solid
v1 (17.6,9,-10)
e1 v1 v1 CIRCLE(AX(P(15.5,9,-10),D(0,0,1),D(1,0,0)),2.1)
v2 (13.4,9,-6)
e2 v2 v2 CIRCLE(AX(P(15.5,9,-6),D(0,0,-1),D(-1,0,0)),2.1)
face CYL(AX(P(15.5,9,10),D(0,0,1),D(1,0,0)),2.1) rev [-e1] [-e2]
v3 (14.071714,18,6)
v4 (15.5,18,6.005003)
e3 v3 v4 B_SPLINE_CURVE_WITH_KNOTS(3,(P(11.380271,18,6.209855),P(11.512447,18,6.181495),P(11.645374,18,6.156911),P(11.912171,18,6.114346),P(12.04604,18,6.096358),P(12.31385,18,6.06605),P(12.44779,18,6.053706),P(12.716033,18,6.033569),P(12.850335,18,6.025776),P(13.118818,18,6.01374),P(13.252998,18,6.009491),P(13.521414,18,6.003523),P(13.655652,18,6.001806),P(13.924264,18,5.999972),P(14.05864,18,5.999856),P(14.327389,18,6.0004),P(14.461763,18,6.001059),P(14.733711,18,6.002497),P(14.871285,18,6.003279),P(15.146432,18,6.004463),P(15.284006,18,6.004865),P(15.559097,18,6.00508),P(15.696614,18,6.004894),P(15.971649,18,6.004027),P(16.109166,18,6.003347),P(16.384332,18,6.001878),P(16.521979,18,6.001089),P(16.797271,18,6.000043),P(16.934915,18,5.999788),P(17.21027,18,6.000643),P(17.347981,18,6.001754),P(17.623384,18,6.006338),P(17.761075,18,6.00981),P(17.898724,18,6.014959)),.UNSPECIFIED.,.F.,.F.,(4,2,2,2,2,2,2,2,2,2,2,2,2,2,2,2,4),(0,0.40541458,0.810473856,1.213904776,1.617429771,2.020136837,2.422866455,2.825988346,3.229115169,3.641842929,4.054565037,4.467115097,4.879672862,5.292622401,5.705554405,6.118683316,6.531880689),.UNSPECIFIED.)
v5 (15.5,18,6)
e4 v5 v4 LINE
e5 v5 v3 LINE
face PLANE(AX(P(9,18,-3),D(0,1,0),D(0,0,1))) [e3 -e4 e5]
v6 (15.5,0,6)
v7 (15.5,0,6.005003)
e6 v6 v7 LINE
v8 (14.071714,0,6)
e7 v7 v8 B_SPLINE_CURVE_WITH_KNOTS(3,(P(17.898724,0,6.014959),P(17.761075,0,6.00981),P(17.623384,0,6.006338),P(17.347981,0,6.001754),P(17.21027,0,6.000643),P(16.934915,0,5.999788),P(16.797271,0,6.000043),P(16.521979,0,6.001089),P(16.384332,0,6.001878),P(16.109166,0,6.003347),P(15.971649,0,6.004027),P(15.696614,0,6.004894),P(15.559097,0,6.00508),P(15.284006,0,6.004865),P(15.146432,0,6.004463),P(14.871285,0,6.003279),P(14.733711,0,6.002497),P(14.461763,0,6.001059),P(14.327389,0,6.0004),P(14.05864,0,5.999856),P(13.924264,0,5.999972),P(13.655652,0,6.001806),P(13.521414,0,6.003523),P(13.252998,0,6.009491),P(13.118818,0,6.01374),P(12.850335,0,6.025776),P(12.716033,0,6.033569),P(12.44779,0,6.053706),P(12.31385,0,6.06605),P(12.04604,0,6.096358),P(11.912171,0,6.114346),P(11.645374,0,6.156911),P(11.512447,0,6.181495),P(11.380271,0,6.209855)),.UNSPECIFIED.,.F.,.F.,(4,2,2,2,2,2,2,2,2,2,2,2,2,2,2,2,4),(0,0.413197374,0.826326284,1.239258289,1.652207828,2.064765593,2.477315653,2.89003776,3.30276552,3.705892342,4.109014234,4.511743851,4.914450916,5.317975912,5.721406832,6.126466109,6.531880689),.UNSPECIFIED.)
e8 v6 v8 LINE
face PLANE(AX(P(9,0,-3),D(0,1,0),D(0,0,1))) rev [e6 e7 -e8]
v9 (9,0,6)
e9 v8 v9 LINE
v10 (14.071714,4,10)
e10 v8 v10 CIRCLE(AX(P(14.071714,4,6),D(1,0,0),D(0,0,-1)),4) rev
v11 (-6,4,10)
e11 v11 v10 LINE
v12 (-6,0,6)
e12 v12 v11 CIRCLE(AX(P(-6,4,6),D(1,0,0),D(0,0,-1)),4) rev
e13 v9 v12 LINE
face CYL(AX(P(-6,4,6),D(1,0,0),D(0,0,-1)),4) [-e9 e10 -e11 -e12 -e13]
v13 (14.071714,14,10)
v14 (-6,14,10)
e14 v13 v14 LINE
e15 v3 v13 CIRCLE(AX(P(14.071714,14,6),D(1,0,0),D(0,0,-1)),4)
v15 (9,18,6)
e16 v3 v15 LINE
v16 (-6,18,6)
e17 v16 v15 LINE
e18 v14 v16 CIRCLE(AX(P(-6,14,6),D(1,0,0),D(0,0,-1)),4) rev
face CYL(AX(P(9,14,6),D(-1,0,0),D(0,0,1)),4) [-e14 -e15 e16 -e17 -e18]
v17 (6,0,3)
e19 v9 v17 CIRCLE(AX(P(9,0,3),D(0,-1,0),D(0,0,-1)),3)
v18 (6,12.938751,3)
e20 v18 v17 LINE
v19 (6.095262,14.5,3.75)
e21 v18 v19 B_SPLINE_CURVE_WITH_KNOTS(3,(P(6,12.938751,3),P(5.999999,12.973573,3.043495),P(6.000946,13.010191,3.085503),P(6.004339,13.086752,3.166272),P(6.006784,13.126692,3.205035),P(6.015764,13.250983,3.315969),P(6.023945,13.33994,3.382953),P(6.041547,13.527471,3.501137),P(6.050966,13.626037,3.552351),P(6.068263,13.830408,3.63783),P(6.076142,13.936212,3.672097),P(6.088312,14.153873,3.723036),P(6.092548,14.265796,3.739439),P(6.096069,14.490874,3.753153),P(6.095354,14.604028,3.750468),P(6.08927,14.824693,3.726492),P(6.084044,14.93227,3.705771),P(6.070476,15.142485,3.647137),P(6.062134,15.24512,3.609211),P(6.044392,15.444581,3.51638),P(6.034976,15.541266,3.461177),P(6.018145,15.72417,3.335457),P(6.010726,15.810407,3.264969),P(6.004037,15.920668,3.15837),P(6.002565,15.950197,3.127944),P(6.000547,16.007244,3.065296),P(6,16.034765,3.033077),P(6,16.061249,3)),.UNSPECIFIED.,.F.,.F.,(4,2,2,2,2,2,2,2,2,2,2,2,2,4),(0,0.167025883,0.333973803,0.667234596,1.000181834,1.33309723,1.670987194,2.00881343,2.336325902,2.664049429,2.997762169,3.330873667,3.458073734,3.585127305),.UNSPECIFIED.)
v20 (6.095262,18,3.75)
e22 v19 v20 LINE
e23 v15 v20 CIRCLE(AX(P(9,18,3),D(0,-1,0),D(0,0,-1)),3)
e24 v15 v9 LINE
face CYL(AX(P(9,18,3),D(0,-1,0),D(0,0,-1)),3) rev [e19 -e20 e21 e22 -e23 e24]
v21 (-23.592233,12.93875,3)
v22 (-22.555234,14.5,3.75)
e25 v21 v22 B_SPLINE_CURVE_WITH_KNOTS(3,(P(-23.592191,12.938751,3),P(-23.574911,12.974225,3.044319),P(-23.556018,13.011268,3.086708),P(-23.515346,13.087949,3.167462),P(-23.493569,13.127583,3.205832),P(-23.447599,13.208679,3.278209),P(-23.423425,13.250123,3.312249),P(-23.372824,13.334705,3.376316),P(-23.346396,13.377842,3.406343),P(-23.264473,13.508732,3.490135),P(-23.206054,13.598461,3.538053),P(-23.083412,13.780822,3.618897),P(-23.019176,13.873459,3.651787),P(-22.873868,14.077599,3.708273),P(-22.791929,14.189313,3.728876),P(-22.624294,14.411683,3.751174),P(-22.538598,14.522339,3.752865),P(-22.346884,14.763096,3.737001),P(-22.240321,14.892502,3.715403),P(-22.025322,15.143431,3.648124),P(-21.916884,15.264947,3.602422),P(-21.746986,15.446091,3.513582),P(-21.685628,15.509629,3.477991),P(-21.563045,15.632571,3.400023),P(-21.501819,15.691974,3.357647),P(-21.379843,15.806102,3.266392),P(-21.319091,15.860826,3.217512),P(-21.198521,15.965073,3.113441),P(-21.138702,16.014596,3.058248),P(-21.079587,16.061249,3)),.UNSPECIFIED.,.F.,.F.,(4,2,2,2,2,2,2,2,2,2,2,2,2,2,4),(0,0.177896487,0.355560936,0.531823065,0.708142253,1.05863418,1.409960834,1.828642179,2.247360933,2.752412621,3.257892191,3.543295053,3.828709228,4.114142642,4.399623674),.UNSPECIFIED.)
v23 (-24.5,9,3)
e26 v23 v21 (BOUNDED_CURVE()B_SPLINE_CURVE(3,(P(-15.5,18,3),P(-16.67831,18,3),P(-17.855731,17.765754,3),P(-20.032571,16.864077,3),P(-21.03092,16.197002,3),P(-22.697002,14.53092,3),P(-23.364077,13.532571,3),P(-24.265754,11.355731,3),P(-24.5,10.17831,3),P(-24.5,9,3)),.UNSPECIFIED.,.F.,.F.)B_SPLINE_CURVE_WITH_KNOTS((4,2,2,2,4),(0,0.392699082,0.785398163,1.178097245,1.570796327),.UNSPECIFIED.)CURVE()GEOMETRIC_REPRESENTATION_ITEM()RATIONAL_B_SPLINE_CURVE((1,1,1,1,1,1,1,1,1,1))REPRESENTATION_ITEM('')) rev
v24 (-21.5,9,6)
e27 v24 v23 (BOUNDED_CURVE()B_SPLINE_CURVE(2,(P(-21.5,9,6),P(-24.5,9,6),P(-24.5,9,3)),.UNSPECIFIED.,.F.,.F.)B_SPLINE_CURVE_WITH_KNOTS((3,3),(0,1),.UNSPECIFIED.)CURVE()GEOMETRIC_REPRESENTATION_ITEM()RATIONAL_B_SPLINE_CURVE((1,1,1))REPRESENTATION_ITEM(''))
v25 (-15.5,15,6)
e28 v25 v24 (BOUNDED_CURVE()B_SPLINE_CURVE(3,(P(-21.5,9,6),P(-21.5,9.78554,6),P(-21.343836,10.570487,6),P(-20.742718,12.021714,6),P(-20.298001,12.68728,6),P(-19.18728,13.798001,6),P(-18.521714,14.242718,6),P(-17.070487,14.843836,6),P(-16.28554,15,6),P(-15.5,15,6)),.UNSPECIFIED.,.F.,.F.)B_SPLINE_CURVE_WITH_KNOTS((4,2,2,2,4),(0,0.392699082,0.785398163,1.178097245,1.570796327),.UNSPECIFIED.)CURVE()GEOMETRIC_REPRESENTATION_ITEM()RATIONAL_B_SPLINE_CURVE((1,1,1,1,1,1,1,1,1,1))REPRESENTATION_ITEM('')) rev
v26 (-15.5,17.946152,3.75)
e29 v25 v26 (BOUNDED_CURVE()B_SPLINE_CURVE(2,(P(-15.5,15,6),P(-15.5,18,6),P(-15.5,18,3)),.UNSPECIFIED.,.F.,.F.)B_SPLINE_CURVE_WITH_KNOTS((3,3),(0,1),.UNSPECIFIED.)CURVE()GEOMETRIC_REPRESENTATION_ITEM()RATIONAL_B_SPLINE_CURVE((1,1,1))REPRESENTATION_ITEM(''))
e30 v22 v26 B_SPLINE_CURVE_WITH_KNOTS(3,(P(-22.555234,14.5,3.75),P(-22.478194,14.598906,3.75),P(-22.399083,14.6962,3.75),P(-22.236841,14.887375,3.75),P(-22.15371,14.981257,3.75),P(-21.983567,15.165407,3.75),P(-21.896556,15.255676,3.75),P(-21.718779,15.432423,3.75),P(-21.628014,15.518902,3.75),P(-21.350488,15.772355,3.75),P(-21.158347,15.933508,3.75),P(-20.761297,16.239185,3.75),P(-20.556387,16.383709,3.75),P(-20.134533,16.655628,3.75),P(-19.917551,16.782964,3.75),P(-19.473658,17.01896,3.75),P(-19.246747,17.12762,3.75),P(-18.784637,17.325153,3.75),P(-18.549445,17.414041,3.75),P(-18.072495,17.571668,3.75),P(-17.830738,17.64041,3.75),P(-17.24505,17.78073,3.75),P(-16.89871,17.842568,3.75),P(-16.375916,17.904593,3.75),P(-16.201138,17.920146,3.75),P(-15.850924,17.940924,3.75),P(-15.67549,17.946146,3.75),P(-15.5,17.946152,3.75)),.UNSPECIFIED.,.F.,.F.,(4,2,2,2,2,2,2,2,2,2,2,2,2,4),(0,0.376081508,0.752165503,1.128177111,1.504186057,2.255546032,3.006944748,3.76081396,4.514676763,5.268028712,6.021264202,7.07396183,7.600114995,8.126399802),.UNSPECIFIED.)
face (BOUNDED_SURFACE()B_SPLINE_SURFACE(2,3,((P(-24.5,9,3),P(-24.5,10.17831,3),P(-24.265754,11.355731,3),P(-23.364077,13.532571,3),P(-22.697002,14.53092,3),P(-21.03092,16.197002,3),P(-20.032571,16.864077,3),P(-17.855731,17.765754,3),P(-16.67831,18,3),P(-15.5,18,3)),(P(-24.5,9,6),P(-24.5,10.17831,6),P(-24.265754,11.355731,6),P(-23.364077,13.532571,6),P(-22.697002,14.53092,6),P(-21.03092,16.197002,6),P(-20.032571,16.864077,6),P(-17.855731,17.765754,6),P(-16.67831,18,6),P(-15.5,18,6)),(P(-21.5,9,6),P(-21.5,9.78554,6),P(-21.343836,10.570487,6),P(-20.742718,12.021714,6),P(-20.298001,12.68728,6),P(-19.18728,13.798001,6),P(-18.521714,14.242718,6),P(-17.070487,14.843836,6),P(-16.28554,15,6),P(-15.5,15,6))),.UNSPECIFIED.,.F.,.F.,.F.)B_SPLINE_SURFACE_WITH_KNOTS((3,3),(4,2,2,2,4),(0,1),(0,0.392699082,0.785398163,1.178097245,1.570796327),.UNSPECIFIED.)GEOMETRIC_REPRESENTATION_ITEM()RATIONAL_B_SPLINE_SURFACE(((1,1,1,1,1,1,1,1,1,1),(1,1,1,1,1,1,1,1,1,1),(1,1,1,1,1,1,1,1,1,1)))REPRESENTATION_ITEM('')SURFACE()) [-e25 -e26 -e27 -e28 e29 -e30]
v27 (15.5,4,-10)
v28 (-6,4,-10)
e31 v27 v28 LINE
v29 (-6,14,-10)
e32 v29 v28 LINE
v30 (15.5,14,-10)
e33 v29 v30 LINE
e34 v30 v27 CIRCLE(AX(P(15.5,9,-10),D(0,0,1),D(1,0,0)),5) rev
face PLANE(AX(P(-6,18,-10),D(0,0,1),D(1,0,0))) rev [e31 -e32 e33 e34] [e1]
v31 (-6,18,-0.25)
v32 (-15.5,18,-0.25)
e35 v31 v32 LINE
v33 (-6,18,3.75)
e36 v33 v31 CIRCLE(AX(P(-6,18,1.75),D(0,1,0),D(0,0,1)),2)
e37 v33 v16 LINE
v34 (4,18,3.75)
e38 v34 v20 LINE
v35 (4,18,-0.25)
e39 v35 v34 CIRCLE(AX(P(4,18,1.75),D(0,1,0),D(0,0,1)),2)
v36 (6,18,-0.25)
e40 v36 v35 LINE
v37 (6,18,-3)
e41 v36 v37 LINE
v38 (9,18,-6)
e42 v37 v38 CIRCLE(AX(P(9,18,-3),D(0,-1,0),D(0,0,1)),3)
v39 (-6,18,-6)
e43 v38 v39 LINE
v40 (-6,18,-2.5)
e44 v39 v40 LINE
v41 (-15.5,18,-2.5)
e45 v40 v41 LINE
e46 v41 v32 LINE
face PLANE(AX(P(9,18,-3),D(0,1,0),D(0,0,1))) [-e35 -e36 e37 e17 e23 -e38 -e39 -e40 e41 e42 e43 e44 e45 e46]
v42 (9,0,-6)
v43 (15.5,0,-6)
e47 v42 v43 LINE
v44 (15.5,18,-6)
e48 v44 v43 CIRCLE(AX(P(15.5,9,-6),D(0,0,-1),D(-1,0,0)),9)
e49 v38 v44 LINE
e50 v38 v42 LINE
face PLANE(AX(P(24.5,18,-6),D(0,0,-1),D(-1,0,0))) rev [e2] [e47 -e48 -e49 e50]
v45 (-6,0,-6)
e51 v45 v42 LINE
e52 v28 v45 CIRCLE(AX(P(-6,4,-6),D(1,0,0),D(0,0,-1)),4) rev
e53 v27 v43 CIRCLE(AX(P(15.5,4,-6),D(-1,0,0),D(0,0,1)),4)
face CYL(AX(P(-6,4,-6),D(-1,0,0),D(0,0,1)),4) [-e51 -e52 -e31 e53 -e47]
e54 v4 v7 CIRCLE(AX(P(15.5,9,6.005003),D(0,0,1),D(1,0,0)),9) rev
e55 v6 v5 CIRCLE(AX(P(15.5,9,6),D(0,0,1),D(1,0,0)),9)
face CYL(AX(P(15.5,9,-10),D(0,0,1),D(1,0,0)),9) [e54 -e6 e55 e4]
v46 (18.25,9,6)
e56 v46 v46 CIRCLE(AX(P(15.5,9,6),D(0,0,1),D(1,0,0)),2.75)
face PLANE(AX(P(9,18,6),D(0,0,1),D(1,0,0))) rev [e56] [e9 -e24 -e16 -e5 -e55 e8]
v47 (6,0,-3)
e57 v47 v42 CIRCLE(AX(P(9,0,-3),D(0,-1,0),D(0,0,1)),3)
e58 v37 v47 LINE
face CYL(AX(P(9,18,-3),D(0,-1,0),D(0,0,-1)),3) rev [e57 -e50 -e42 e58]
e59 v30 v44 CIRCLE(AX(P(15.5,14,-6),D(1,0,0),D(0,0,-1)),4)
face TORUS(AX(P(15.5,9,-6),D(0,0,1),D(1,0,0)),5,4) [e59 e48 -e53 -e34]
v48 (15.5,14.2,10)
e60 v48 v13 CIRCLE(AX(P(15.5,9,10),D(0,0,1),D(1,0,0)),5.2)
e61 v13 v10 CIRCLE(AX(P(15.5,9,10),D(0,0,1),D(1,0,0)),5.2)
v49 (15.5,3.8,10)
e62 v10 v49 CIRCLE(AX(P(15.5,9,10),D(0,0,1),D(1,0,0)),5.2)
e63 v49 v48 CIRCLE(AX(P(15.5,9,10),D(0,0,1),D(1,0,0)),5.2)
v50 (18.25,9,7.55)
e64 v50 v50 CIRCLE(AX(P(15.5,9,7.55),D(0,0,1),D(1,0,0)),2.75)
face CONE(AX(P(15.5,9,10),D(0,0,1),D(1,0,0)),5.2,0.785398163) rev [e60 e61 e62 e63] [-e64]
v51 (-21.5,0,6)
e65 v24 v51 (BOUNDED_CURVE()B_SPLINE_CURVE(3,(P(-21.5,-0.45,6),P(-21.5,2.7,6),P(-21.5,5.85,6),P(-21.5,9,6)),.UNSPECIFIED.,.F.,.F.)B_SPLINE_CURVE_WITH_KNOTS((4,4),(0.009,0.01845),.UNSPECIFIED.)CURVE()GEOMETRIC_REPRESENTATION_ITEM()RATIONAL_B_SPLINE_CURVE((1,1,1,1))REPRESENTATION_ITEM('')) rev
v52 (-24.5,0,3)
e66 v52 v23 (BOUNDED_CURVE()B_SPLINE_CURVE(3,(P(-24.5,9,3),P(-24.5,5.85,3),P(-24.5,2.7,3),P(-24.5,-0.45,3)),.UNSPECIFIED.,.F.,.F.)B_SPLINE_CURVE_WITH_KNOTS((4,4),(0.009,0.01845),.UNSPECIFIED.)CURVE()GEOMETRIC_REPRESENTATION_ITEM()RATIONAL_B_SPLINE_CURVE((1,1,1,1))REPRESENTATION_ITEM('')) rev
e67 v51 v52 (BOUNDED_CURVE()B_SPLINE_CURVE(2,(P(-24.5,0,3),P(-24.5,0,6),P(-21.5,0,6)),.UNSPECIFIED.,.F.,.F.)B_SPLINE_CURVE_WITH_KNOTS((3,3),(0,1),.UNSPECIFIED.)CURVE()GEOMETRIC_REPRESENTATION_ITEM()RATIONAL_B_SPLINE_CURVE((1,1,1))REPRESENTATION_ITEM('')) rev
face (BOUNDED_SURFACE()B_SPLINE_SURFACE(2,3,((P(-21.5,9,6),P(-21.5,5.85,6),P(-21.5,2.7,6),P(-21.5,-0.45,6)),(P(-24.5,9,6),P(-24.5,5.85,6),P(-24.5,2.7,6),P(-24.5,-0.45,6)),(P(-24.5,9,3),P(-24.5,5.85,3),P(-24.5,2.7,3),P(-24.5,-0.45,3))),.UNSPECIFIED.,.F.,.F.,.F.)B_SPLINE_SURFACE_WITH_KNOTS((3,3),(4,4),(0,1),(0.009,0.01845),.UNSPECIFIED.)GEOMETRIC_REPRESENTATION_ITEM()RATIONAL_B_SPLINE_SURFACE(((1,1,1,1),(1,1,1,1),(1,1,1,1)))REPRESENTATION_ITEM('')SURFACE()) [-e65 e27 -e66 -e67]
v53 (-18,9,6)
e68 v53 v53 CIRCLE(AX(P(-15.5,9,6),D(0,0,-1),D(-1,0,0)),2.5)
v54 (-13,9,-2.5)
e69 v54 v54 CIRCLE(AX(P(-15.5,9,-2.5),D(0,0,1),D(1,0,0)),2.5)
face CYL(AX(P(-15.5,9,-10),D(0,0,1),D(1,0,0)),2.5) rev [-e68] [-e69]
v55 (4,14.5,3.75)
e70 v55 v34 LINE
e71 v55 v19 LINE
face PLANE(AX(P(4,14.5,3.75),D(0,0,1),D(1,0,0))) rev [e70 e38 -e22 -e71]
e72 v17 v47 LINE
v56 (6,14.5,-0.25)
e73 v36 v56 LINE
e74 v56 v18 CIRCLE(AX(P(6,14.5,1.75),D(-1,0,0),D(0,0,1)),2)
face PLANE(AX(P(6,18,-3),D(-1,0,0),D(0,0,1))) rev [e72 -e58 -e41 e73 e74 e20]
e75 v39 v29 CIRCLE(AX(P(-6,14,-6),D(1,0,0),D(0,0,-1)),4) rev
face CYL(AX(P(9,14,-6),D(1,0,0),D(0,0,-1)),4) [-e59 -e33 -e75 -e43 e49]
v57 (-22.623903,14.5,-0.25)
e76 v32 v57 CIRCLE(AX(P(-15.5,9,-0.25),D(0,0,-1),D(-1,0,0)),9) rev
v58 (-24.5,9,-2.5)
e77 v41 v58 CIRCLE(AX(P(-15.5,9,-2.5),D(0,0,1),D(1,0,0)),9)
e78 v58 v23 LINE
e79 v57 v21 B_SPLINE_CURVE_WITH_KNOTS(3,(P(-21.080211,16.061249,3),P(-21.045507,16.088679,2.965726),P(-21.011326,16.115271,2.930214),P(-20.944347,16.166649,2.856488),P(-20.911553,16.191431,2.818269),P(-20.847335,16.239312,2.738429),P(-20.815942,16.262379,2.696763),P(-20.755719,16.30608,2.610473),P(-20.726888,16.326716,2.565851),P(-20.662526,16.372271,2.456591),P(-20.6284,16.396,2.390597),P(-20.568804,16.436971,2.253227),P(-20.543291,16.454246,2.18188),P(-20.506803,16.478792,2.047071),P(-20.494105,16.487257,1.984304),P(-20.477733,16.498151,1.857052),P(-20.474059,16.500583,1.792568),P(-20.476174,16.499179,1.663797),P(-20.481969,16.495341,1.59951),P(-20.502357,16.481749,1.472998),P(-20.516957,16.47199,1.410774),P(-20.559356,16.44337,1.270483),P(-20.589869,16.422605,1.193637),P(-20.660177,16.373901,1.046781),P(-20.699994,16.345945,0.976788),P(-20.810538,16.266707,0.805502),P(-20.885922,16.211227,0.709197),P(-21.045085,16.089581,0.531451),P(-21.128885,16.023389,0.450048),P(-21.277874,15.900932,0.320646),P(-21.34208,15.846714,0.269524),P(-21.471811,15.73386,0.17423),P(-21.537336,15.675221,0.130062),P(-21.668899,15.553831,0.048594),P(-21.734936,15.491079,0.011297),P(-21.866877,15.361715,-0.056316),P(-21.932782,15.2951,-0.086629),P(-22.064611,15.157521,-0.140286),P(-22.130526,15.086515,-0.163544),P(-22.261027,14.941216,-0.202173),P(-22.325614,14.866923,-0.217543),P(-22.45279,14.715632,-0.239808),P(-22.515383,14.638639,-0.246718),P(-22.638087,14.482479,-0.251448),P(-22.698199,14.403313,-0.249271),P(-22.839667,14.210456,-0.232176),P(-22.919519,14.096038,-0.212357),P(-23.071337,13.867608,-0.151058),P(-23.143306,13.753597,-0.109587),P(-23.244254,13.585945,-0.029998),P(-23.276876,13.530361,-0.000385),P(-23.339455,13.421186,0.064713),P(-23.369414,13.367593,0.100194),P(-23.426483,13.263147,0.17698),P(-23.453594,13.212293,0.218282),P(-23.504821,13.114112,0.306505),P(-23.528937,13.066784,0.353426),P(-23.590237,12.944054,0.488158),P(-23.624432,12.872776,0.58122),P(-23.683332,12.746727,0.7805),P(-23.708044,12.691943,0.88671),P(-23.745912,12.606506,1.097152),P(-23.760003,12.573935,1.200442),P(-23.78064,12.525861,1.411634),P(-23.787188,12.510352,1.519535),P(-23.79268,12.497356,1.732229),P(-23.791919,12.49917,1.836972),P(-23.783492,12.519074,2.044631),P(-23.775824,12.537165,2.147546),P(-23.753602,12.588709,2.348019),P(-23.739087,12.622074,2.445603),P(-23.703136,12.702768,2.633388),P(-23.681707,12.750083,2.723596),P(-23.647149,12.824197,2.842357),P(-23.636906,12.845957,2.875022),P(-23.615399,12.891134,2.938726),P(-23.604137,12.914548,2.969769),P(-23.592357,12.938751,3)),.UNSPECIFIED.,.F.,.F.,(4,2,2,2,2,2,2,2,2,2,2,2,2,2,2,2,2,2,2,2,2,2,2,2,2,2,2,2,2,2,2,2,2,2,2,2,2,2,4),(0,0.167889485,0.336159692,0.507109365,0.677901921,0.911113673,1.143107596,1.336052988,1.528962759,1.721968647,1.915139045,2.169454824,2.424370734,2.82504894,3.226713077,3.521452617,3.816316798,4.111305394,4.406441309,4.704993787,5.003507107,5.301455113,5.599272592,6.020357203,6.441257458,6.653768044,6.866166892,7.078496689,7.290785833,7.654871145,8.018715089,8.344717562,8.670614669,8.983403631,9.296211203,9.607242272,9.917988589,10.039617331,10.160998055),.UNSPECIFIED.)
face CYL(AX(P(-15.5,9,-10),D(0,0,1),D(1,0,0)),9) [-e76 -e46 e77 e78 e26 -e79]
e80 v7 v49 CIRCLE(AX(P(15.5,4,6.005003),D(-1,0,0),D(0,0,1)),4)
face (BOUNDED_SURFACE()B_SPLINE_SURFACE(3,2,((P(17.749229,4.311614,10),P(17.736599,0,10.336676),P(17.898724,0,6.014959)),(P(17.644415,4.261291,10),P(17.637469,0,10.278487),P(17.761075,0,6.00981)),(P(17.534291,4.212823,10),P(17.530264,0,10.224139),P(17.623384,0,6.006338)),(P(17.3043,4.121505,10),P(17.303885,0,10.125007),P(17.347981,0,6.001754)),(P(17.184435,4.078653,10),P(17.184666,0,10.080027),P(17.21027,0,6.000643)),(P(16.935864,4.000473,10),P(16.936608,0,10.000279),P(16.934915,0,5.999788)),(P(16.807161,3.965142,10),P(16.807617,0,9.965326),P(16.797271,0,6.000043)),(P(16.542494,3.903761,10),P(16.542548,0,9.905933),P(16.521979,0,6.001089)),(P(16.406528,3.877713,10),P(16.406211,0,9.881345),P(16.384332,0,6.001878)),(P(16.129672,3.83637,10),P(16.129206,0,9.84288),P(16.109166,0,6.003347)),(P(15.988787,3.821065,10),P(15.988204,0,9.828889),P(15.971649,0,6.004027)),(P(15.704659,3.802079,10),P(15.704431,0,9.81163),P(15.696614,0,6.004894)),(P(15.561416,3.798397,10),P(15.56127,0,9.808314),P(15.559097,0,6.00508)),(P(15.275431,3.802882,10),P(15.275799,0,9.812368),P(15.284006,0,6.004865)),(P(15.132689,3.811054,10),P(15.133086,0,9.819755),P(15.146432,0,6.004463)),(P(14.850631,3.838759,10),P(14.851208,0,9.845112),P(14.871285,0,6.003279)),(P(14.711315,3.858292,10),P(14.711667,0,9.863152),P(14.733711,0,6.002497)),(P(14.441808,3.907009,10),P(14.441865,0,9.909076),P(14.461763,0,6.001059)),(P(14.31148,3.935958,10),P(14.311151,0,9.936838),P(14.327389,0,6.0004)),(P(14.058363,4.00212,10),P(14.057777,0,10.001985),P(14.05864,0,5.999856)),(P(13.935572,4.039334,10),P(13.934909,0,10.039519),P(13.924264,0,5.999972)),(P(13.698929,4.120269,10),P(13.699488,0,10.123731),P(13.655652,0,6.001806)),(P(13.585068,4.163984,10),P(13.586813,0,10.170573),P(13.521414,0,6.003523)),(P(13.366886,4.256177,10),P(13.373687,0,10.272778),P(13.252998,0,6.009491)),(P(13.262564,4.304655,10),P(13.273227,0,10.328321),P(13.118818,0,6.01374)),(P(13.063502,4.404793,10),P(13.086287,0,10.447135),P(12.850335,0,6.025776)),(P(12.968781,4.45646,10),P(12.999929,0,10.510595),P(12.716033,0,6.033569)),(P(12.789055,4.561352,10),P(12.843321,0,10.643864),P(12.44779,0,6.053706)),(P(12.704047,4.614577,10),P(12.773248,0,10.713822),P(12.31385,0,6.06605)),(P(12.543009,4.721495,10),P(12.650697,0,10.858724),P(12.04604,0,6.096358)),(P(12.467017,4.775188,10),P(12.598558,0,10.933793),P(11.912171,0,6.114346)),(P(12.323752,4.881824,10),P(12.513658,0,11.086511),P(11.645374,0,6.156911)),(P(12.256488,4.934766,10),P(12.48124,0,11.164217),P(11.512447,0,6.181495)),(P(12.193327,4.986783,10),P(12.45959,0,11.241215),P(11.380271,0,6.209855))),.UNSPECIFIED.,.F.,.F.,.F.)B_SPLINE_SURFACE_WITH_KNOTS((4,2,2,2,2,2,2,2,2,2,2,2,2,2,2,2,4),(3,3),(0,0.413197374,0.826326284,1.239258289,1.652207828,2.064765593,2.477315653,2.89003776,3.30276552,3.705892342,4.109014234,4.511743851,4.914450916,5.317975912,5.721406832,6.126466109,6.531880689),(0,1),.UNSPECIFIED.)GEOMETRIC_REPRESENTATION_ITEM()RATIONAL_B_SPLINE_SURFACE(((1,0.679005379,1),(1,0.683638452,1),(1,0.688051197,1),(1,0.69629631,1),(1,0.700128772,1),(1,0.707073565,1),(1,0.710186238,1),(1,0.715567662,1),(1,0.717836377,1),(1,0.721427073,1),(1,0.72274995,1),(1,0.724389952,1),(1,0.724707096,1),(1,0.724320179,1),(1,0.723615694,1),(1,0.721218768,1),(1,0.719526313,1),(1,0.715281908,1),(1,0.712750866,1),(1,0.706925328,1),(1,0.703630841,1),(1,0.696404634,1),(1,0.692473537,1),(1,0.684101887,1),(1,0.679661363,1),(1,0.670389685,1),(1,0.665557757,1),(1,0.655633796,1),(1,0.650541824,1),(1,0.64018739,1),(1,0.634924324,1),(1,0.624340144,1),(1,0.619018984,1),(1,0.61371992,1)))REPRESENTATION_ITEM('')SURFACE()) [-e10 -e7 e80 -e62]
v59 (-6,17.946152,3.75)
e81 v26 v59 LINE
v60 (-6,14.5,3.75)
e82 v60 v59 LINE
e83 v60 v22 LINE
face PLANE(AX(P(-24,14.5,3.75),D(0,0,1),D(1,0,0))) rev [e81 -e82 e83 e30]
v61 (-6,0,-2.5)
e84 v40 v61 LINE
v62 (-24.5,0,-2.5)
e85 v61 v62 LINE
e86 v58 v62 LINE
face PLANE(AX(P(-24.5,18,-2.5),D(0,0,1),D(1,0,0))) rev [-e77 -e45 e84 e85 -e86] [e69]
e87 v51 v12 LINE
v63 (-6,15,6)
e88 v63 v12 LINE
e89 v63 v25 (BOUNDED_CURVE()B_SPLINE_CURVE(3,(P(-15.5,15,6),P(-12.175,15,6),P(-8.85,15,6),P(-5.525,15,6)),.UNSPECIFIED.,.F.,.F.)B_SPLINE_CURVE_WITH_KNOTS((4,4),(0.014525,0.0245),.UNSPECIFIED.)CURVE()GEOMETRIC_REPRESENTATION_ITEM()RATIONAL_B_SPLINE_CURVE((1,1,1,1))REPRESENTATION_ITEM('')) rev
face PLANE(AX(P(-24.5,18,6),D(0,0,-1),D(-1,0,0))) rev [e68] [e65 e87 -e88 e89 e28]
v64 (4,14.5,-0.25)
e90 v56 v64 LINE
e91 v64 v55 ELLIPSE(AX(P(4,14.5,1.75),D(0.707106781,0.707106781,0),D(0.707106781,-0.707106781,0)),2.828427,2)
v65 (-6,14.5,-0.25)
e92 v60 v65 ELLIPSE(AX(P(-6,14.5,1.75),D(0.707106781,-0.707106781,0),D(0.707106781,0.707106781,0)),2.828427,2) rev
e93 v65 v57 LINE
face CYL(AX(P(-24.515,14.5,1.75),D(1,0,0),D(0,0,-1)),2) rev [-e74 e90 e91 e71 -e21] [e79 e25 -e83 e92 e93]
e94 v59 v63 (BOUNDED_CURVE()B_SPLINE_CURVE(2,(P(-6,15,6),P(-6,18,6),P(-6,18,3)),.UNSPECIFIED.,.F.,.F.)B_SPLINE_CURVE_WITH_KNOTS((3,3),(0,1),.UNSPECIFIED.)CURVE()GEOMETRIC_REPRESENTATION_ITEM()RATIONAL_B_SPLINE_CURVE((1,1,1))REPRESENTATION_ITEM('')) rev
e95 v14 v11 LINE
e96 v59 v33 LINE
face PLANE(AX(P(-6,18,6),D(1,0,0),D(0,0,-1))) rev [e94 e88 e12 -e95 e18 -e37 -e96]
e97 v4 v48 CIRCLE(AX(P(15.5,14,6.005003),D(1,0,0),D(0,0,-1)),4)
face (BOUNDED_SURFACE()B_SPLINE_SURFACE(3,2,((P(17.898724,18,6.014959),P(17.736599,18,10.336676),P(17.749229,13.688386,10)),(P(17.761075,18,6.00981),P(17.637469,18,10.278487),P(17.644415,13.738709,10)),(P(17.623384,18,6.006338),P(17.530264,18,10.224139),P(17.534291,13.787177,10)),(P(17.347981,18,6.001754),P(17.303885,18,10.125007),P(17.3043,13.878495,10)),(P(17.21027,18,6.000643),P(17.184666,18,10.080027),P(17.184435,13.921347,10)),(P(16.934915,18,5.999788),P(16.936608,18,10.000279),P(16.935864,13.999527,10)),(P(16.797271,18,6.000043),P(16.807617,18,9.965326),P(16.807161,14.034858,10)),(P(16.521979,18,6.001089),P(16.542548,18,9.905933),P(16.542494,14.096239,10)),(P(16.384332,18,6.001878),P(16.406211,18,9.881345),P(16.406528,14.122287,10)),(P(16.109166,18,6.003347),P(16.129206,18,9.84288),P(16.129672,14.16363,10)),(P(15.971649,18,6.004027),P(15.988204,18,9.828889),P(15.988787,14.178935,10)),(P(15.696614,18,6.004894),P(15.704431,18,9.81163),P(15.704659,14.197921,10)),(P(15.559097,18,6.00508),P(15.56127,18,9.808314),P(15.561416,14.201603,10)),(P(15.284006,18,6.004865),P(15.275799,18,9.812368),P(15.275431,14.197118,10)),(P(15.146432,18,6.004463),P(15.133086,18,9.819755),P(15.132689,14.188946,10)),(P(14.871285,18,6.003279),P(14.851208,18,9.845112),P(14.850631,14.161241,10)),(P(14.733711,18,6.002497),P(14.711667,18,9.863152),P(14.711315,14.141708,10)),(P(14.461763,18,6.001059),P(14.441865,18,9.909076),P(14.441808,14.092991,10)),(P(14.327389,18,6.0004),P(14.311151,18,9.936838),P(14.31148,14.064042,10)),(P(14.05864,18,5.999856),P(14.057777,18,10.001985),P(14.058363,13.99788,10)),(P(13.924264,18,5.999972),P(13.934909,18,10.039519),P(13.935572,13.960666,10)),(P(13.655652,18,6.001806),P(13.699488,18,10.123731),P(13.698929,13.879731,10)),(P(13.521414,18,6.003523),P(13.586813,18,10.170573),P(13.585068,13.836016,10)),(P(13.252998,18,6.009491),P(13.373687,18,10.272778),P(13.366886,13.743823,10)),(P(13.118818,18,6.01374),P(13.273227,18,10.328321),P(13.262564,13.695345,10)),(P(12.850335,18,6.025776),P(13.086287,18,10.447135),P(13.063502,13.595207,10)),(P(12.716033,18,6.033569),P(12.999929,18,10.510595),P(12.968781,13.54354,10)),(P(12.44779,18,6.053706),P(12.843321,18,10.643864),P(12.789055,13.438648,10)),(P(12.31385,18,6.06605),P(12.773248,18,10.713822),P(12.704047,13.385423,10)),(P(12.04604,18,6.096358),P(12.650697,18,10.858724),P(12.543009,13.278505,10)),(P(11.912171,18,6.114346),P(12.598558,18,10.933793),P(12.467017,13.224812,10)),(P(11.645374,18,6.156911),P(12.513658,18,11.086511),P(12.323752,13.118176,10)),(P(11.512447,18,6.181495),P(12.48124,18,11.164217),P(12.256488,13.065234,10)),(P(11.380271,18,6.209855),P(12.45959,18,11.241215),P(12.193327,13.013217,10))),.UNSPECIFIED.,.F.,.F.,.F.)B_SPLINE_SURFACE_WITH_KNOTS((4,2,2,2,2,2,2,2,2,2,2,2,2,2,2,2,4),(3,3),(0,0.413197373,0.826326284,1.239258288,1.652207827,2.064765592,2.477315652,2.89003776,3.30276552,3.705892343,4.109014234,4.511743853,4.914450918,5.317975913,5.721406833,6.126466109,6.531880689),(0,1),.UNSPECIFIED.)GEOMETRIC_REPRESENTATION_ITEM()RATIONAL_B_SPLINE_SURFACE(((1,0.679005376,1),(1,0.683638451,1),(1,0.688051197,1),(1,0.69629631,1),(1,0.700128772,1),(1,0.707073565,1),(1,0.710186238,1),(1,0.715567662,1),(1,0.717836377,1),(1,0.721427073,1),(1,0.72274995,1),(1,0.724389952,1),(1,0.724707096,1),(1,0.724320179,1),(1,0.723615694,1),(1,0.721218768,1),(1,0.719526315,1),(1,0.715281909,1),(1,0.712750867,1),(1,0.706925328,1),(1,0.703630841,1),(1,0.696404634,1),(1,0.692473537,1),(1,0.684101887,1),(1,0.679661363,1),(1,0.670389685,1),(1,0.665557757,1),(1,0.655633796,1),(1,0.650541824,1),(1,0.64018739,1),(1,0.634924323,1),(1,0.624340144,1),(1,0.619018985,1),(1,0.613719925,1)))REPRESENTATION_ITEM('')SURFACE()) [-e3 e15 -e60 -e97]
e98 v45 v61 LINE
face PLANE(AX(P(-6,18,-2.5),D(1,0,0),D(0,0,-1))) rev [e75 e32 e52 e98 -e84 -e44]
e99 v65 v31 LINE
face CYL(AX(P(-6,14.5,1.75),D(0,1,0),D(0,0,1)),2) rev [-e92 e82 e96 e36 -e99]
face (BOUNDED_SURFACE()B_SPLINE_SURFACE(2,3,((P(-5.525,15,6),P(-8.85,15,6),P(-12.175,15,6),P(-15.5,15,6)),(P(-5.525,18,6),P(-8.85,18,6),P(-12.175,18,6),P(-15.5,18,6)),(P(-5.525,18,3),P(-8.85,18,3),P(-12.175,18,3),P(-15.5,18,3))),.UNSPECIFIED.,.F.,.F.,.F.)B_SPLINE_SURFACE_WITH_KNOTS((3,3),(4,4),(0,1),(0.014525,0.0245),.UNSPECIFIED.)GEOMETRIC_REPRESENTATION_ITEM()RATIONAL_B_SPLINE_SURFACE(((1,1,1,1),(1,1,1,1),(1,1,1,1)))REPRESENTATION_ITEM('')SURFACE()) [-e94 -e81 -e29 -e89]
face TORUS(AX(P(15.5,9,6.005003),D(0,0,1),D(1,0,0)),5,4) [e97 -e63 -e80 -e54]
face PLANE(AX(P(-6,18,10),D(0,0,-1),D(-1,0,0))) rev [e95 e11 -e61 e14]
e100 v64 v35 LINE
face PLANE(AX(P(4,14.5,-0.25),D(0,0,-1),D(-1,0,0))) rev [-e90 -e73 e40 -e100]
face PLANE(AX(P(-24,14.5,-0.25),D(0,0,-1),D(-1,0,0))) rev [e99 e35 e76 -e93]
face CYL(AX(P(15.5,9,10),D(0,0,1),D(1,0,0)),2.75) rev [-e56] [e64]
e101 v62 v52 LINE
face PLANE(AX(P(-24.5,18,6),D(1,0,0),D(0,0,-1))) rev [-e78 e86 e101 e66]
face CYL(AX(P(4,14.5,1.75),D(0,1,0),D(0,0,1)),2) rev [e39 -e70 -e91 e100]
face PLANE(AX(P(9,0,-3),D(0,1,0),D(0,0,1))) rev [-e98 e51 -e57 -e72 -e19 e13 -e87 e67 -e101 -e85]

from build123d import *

# Parameters (mm, degrees)
BOSS_EXTRUDE1_DEPTH         = 18
SKETCH5_OUTSIDE_W           = 62.18
SKETCH5_OUTSIDE_H           = 31.18
SKETCH5_OUTSIDE_R           = 2.5
CUT_EXTRUDE1_DEPTH          = 20
M5_TAPPED_HOLE1_D           = 4.2
M5_TAPPED_HOLE1_CSINK_D     = 10.4
M5_TAPPED_HOLE1_CSINK_ANGLE = 90
FILLET1_R                   = 4
FILLET2_R                   = 4
FILLET3_SIZE                = 3
CUT_EXTRUDE2_DEPTH          = 37.800136028
CUT_EXTRUDE2_DEPTH_BACK     = 37.800136028
SKETCH12_R                  = 2
CUT_EXTRUDE3_DEPTH          = 3.5
CUT_EXTRUDE4_DEPTH          = 3.5


# Some blends are built 0.0001 mm under size
with BuildPart() as part:
    # Sketch2 → Boss-Extrude1 (new body)
    with BuildSketch(Plane(origin=(0, 0, 0), x_dir=(1, 0, 0), z_dir=(0, 1, 0))):
        with BuildLine():
            Line((-6, 10), (24.5, 10))
            Line((24.5, 10), (24.5, 6))
            Line((24.5, 6), (9, 6))
            ThreePointArc((9, 6), (6.878679656, 5.121320344), (6, 3))
            Line((6, 3), (6, -3))
            ThreePointArc((6, -3), (6.878679656, -5.121320344), (9, -6))
            Line((9, -6), (24.5, -6))
            Line((24.5, -6), (24.5, -10))
            Line((24.5, -10), (-6, -10))
            Line((-6, -10), (-6, -6))
            Line((-6, -6), (-24.5, -6))
            Line((-24.5, -6), (-24.5, 2.5))
            Line((-24.5, 2.5), (-6, 2.5))
            Line((-6, 2.5), (-6, 10))
        make_face()
    extrude(amount=BOSS_EXTRUDE1_DEPTH)

    # Sketch5 outside → Cut-Extrude1 (cut)
    # profile 1 of 2: a face of its own
    with BuildSketch(Plane.XY.offset(10)):
        with Locations((0, 9)):
            Rectangle(SKETCH5_OUTSIDE_W, SKETCH5_OUTSIDE_H)
        with BuildLine():
            Line((-24.5, 9), (-24.5, 0))
            Line((-24.5, 0), (15.5, 0))
            ThreePointArc((15.5, 0), (24.5, 9), (15.5, 18))
            Line((15.5, 18), (-15.5, 18))
            ThreePointArc((-15.5, 18), (-21.863961031, 15.363961031), (-24.5, 9))
        make_face(mode=Mode.SUBTRACT)
    # profile 2 of 2: a face of its own
    with BuildSketch(Plane.XY.offset(10)):
        with Locations((-15.5, 9)):
            Circle(SKETCH5_OUTSIDE_R)
    extrude(amount=-CUT_EXTRUDE1_DEPTH, mode=Mode.SUBTRACT)

    # Sketch8 → CSK for M5 Countersunk Flat Head Screw1 (revolve, cut)
    with BuildSketch(Plane(origin=(15.5, 9, 10), x_dir=(0, -1, 0), z_dir=(1, 0, 0))):
        Polygon((0, 0), (0, 4), (2.75, 4), (2.75, 2.45), (5.2, 0), align=None)
    revolve(axis=Axis((15.5, 9, 16.35), (0, 0, -1)), mode=Mode.SUBTRACT)

    # M5 Tapped Hole1 (through all)
    with Locations(Plane.XY.offset(10)):
        with Locations((15.5, 9)):
            CounterSinkHole(M5_TAPPED_HOLE1_D / 2, M5_TAPPED_HOLE1_CSINK_D / 2, counter_sink_angle=M5_TAPPED_HOLE1_CSINK_ANGLE)

    # Fillet1
    fillet1_edges = [part.edges().sort_by_distance(p)[0] for p in [
        (4.75, 0, 10),
        (4.75, 18, 10),
    ]]
    fillet(fillet1_edges, radius=FILLET1_R - 0.0001)  # a hair under: the kernel refuses the full size

    # Fillet2
    fillet2_edges = [part.edges().sort_by_distance(p)[0] for p in [
        (4.75, 0, -10),
        (24.5, 9, -10),
        (4.75, 18, -10),
    ]]
    fillet(fillet2_edges, radius=FILLET2_R - 0.0001)  # a hair under: the kernel refuses the full size

    # Fillet3
    # a fillet whose section is not a circle: 3 mm, written as the material it takes off along each edge
    with BuildSketch(Plane(origin=(-24.5, -7.5, 6), x_dir=(0, 0, -1), z_dir=(0, 1, 0))) as fillet3_piece_1:
        with BuildLine():
            Bezier((FILLET3_SIZE, 0), (0, 0), (0, -FILLET3_SIZE), weights=[1, 1, 1])
            Line((0, -FILLET3_SIZE), (0, 0))
            Line((0, 0), (FILLET3_SIZE, 0))
        make_face()
    extrude(amount=16.5, mode=Mode.SUBTRACT)
    with BuildSketch(Plane(origin=(-6, 18, 6), x_dir=(0, -1, 0), z_dir=(-1, 0, 0))) as fillet3_piece_2:
        with BuildLine():
            Bezier((FILLET3_SIZE, 0), (0, 0), (0, -FILLET3_SIZE), weights=[1, 1, 1])
            Line((0, -FILLET3_SIZE), (0, 0))
            Line((0, 0), (FILLET3_SIZE, 0))
        make_face()
    extrude(amount=9.5, mode=Mode.SUBTRACT)
    with BuildSketch(Plane(origin=(-15.5, 9, 6), x_dir=(0, 1, 0), z_dir=(1, 0, 0))) as fillet3_piece_3:
        with BuildLine():
            Bezier((9 - FILLET3_SIZE, 0), (9, 0), (9, -FILLET3_SIZE), weights=[1, 1, 1])
            Line((9, -FILLET3_SIZE), (9, 0))
            Line((9, 0), (9 - FILLET3_SIZE, 0))
        make_face()
    revolve(axis=Axis((-15.5, 9, 6), (0, 0, 1)), revolution_arc=90, mode=Mode.SUBTRACT)

    # Sketch12 → Cut-Extrude2 (cut, two sides: drawn at the far end of the back side and taken through both)
    with BuildSketch(Plane(origin=(6, 0, 0), x_dir=(0, 0, -1), z_dir=(1, 0, 0)).offset(-CUT_EXTRUDE2_DEPTH_BACK)):
        with Locations(Location((-1.75, 14.5, 0), (0, 0, 231.317812547))):
            Circle(SKETCH12_R)
    extrude(amount=CUT_EXTRUDE2_DEPTH + CUT_EXTRUDE2_DEPTH_BACK, mode=Mode.SUBTRACT)

    # Sketch13 → Cut-Extrude3 (cut)
    with BuildSketch(Plane(origin=(0, 18, 0), x_dir=(1, 0, 0), z_dir=(0, 1, 0))):
        with BuildLine():
            Line((-24, 0.25), (-6, 0.25))
            ThreePointArc((-6, 0.25), (-4, -1.75), (-6, -3.75))
            Line((-6, -3.75), (-24, -3.75))
            Line((-24, -3.75), (-24, 0.25))
        make_face()
    extrude(amount=-CUT_EXTRUDE3_DEPTH, mode=Mode.SUBTRACT)

    # Sketch15 → Cut-Extrude4 (cut)
    with BuildSketch(Plane(origin=(0, 18, 0), x_dir=(1, 0, 0), z_dir=(0, 1, 0))):
        with BuildLine():
            Line((4, 0.25), (9, 0.25))
            Line((9, 0.25), (9, -3.75))
            Line((9, -3.75), (4, -3.75))
            ThreePointArc((4, -3.75), (2, -1.75), (4, 0.25))
        make_face()
    extrude(amount=-CUT_EXTRUDE4_DEPTH, mode=Mode.SUBTRACT)


solid = part.part
